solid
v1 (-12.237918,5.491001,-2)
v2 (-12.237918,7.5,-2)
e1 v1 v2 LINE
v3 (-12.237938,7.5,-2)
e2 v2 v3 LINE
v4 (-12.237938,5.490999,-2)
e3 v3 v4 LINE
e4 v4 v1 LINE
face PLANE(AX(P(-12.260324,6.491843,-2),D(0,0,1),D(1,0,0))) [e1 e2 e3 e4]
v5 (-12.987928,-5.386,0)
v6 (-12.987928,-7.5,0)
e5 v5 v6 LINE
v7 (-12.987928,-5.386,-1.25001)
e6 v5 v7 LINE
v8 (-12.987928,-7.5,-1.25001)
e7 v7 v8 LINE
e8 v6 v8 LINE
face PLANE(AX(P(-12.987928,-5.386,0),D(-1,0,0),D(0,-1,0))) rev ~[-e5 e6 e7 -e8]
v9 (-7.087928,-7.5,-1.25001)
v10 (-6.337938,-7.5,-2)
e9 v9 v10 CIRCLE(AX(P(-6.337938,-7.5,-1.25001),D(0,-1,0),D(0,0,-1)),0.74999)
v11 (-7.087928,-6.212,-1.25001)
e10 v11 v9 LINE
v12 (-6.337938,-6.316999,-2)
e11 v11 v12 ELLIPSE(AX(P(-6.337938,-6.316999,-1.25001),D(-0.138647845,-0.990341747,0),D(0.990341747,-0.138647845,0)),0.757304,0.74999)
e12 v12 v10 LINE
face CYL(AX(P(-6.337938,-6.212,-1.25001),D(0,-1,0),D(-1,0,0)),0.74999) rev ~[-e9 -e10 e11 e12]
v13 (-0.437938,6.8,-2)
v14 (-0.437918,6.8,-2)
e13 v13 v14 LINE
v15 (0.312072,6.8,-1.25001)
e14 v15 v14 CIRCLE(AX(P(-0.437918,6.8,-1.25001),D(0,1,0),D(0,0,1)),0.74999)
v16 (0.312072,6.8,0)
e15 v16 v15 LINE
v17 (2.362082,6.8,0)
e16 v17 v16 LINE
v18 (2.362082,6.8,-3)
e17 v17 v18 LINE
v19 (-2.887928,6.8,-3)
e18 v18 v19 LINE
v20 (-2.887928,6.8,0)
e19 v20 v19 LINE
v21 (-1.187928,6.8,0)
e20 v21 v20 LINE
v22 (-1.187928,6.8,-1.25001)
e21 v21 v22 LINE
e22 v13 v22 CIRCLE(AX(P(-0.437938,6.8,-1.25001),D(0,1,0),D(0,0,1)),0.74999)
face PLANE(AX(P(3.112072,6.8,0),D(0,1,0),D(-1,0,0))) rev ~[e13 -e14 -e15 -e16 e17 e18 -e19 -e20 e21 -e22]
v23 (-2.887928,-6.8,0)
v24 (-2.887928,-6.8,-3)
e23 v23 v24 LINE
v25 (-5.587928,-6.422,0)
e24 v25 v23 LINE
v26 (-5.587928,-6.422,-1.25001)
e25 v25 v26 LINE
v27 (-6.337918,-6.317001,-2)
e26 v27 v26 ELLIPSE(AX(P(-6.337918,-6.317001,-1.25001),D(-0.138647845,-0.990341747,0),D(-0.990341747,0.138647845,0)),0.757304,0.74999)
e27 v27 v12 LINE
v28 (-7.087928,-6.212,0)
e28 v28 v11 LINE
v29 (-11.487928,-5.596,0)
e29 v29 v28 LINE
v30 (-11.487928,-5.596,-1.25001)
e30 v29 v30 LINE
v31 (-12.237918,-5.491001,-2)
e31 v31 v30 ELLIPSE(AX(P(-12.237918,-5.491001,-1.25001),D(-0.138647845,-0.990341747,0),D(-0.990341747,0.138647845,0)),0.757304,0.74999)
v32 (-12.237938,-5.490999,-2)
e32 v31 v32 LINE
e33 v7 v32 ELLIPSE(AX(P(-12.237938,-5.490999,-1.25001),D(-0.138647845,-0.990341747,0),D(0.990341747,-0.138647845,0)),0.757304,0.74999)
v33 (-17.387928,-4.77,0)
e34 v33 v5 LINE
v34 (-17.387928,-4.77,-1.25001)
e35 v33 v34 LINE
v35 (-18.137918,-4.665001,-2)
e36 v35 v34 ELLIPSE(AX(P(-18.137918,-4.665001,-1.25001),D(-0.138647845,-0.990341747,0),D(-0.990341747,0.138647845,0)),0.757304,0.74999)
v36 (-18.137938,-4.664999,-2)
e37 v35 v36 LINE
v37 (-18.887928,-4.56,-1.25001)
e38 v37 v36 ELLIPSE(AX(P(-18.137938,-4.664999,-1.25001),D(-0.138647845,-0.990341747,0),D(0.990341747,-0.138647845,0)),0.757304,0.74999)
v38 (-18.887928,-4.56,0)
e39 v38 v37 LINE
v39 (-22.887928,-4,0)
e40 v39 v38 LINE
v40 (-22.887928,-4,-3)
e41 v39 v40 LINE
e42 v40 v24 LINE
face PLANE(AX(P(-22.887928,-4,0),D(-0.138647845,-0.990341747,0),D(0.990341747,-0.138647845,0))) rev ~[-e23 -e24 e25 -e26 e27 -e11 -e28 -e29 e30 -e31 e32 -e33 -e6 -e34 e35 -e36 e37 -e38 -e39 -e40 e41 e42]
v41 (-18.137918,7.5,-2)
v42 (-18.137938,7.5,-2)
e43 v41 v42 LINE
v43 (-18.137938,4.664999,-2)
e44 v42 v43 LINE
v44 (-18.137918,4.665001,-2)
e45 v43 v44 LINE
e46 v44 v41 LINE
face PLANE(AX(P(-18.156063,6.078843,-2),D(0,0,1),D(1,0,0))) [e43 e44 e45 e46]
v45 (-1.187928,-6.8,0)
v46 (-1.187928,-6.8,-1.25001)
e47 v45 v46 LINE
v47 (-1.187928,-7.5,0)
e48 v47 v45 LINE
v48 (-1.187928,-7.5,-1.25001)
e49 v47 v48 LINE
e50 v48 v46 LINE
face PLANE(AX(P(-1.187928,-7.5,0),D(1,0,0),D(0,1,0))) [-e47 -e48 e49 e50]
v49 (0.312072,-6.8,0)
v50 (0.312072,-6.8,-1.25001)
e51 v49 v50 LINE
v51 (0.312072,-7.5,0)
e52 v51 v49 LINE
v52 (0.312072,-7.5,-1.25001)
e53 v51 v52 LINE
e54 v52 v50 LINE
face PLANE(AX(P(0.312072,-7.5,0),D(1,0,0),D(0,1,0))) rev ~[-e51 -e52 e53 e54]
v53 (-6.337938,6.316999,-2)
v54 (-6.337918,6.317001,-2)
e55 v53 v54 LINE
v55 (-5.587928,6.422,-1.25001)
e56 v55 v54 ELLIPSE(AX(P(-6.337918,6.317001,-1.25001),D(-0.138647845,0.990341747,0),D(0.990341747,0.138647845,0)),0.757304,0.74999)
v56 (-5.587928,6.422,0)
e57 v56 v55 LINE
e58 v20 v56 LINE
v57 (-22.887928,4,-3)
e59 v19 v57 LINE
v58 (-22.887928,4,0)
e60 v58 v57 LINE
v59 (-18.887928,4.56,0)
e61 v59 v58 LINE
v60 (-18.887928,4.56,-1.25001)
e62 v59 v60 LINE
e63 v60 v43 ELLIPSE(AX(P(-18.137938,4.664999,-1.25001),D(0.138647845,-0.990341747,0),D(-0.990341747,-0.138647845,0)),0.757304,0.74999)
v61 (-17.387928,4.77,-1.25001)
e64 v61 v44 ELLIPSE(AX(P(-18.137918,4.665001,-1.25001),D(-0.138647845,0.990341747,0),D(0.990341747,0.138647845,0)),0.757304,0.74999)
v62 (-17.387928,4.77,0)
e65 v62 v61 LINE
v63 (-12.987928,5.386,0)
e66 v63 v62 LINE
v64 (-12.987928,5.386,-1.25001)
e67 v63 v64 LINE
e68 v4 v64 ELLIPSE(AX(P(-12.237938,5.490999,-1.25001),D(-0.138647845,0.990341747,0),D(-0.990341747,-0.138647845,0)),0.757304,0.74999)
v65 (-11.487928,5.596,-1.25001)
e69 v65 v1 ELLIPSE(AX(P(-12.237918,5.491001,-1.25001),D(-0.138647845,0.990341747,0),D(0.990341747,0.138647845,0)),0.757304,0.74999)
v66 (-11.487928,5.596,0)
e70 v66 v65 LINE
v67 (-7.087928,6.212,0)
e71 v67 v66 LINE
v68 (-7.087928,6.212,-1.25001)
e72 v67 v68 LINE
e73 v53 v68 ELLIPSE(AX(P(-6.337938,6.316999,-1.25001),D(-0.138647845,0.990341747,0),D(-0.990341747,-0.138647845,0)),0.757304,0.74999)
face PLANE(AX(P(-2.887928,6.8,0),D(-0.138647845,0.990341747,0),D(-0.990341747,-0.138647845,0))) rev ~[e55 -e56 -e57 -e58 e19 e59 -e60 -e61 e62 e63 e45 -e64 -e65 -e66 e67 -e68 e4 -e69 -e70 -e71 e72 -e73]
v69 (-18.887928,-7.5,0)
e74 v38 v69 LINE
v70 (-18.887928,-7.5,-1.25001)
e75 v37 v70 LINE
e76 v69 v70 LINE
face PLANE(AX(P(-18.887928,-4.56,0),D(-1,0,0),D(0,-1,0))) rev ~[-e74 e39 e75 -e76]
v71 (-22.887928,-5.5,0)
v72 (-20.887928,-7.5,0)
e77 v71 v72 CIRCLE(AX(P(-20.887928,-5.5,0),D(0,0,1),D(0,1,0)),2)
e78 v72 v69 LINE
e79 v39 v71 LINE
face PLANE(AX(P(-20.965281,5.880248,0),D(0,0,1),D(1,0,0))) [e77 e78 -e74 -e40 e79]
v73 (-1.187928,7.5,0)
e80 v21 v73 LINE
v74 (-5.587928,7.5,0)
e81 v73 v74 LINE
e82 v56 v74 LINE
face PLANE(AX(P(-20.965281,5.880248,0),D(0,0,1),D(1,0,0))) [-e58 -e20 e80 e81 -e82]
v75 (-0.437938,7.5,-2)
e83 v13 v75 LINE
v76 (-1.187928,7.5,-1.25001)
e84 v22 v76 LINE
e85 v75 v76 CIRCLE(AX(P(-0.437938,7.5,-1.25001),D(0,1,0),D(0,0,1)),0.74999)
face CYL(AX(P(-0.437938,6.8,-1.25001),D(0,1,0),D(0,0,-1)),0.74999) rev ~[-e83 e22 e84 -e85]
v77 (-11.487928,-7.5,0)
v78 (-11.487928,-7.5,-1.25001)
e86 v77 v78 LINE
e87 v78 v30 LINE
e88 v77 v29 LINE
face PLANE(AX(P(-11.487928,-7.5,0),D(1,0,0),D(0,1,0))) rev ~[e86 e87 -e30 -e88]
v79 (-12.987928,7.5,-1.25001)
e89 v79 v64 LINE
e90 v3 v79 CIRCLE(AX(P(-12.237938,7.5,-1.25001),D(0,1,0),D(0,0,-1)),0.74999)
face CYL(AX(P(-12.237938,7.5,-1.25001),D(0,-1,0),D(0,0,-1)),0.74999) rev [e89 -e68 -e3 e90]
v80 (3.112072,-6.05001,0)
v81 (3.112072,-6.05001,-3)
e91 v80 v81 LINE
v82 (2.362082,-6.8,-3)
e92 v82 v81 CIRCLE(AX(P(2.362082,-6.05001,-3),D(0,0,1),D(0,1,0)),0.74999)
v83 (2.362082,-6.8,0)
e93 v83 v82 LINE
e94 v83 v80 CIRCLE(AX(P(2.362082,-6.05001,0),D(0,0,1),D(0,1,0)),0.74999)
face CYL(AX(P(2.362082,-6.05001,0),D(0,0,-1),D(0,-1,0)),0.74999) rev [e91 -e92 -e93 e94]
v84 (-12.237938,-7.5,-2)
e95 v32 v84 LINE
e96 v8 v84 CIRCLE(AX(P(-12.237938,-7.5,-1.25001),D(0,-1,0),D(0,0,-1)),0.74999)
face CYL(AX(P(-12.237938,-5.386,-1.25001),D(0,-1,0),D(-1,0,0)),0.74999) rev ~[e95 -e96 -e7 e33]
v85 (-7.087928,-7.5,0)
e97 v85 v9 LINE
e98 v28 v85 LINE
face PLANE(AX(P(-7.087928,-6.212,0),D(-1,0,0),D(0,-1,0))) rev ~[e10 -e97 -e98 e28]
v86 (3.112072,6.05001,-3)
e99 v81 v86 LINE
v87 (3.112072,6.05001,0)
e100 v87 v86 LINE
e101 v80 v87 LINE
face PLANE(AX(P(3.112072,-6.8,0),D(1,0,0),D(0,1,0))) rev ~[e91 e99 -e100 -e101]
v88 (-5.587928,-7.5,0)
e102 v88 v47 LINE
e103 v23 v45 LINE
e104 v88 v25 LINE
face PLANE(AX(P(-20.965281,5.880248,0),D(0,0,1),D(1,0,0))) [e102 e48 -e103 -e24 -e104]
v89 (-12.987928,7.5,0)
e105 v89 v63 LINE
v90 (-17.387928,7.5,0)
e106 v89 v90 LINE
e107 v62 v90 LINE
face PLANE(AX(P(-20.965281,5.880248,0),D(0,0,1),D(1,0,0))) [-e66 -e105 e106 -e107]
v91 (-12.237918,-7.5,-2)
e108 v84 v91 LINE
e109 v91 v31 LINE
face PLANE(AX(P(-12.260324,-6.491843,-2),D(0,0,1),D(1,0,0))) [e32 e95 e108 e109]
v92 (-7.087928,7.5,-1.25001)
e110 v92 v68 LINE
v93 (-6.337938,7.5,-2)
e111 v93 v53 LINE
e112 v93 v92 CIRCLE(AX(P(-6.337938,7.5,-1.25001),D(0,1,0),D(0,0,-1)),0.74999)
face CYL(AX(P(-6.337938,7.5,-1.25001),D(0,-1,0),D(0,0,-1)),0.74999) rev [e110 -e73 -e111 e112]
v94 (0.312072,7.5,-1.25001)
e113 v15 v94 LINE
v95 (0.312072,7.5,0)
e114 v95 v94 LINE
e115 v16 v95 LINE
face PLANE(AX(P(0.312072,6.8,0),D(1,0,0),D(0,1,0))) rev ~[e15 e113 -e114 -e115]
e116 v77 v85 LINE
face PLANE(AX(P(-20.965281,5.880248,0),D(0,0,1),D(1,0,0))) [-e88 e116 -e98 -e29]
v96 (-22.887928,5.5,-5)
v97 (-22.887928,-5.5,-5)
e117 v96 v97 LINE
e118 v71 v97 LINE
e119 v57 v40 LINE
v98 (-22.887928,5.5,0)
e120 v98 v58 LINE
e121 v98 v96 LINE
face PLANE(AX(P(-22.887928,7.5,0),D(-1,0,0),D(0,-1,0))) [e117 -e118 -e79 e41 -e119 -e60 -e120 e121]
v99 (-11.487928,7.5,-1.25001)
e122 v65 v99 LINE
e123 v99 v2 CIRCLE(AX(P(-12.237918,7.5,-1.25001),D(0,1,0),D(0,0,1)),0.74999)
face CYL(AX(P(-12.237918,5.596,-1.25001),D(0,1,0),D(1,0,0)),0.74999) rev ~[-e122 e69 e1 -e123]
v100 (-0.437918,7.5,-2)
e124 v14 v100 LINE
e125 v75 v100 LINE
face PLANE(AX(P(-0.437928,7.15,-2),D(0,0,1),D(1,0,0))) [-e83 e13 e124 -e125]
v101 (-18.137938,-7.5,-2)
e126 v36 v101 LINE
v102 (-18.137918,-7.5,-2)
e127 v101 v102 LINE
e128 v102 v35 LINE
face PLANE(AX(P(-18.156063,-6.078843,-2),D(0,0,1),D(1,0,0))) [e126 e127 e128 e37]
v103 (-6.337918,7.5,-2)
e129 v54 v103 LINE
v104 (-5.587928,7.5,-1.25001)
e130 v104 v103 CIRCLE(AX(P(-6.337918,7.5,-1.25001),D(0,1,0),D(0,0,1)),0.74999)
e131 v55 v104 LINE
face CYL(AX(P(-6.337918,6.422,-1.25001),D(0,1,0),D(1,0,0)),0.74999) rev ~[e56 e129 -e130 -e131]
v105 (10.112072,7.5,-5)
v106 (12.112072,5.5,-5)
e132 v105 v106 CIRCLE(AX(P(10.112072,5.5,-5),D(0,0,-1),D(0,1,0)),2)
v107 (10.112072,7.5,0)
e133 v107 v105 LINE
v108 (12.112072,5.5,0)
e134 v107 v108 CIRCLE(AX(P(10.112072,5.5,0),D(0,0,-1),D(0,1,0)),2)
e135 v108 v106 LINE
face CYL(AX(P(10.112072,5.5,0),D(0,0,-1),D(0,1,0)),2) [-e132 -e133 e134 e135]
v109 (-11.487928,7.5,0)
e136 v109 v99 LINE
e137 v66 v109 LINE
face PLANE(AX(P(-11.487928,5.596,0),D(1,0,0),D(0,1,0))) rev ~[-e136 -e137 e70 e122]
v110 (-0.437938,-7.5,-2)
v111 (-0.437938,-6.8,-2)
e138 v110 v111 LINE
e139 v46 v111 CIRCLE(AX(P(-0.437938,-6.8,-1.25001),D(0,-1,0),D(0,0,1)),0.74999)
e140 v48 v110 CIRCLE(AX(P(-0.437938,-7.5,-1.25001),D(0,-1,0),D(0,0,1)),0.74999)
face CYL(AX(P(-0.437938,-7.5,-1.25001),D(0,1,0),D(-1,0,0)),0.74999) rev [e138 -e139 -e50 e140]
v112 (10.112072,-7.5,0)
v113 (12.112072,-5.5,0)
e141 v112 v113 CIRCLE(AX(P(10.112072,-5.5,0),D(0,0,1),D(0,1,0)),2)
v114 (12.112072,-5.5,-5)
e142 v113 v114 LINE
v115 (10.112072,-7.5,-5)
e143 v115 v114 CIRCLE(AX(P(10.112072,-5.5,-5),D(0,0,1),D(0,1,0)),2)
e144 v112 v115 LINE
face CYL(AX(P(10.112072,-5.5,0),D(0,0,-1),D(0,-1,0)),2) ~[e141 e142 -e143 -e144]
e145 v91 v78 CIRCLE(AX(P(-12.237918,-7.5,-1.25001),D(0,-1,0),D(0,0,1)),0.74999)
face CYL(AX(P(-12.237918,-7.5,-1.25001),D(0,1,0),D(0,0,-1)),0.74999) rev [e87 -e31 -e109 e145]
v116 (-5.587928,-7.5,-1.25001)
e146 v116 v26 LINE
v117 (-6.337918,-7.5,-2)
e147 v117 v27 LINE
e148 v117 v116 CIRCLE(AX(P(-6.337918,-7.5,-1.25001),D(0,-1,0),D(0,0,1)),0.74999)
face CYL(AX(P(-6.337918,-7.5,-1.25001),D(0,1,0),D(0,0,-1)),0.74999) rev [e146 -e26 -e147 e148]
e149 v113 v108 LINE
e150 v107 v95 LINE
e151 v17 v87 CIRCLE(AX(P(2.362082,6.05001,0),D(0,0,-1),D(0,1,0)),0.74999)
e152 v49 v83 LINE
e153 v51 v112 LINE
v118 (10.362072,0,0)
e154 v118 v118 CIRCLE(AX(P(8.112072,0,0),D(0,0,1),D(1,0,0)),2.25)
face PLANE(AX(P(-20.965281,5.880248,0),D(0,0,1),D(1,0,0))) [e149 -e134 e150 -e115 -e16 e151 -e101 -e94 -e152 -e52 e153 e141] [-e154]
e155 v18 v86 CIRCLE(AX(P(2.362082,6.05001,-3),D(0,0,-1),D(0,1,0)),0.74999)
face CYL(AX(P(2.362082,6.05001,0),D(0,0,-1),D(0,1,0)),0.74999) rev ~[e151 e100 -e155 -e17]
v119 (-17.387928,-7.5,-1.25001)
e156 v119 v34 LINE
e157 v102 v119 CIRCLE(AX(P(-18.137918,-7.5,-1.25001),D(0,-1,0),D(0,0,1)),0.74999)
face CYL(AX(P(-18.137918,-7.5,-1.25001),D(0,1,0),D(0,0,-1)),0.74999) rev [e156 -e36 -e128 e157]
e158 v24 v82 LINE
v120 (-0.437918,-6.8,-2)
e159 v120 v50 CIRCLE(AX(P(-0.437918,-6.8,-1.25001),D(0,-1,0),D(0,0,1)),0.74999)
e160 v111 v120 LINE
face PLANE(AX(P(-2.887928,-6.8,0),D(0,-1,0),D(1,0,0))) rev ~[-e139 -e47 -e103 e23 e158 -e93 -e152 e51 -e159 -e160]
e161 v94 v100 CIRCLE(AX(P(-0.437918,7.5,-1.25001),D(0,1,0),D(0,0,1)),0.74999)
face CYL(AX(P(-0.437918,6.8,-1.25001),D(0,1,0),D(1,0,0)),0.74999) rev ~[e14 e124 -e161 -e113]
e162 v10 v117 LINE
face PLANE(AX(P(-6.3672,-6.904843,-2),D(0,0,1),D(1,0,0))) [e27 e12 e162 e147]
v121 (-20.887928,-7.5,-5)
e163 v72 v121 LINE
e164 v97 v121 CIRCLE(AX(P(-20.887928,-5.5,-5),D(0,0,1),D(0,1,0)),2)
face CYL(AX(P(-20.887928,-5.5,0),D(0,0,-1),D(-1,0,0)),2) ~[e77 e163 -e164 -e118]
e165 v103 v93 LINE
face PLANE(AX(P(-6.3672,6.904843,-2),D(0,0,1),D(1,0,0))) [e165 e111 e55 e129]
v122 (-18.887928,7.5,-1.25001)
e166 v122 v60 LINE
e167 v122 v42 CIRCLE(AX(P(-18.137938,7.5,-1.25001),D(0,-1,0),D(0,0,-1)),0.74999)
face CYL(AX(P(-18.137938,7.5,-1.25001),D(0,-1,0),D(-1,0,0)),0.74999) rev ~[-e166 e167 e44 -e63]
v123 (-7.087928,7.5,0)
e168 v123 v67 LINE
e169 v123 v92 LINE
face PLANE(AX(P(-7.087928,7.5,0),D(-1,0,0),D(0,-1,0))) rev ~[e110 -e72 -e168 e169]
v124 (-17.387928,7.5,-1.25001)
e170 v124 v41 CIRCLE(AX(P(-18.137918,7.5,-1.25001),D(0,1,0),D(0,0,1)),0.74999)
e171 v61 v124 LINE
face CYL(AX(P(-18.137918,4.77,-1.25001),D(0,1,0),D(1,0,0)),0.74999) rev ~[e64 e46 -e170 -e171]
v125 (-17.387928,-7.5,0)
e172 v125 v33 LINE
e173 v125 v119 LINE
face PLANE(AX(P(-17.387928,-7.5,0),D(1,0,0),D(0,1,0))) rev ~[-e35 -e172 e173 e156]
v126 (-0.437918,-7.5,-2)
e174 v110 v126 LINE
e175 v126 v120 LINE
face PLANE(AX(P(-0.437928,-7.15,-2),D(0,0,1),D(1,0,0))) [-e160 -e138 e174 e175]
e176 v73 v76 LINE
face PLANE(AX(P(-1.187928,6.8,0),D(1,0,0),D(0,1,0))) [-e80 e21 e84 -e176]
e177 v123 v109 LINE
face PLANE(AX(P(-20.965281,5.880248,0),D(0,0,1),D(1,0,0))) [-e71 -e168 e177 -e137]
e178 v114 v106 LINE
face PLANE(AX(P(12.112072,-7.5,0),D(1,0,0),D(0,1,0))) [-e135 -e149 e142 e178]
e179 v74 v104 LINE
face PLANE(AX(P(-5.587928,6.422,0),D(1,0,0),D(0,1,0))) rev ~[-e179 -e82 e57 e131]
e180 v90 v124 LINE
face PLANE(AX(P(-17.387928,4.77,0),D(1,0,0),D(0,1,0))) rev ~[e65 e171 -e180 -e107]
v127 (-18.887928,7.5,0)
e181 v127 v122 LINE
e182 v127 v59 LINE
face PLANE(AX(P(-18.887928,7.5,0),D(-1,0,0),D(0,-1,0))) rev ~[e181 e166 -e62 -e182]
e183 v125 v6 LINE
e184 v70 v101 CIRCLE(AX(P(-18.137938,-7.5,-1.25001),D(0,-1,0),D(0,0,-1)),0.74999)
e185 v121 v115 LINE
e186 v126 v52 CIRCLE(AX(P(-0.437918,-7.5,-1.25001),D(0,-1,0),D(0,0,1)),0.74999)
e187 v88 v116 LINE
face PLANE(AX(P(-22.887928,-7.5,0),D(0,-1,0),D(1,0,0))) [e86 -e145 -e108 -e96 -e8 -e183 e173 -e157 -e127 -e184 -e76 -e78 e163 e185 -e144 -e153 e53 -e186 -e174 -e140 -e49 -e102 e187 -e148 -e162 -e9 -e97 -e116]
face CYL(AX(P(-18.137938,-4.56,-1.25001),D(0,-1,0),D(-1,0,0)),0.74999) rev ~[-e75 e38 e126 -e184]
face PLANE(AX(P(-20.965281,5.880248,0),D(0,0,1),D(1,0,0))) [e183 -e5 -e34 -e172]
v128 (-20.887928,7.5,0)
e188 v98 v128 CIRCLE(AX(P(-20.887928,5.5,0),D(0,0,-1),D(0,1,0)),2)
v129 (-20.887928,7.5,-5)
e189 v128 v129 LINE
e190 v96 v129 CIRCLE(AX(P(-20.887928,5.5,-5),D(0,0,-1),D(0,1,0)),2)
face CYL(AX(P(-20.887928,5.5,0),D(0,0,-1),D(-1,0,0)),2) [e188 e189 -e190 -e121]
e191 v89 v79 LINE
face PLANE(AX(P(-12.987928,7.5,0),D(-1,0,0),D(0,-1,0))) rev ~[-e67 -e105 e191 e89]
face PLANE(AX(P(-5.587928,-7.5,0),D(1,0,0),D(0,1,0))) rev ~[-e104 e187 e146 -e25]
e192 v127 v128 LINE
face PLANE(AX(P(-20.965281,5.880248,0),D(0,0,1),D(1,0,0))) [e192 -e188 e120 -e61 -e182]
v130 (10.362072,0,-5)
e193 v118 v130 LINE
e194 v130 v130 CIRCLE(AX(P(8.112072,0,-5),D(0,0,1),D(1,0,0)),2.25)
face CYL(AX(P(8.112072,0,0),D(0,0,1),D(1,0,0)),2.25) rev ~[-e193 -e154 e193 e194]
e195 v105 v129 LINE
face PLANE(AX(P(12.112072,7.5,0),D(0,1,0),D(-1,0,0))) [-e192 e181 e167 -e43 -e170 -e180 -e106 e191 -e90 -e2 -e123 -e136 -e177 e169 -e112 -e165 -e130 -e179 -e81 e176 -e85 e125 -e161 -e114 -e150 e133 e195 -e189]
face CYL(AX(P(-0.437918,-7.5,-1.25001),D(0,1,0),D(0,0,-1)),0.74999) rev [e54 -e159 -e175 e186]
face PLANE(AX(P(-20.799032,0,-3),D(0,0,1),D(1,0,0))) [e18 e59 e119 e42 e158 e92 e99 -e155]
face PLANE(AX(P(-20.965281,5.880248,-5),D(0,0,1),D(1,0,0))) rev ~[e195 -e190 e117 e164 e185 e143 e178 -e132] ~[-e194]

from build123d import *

# Parameters (mm, degrees)
F0_W     = 1.5
F0_H     = 0.7
F0_R     = 2.25
F0_H_2   = 13.6
F0_W_2   = 2.8
F1_DEPTH = 5
F2_DEPTH = 3
F3_DEPTH = 2
F4_R     = 0.74999
F5_R     = 2


# Not quite as in the source:
# - a fillet or chamfer is up to 0.001 mm smaller than in the source, because OpenCascade refuses the exact size


with BuildPart() as f1:
    # F0 (on Top) → F1 (new body)
    with BuildSketch(Plane.XY):
        Polygon((-18.8879279066, 7.5), (-22.8879279066, 7.5), (-22.8879279066, 4), (-18.8879279066, 4.56), align=None)
        Polygon((-17.3879279066, 7.5), (-18.8879279066, 7.5), (-18.8879279066, 4.56), (-17.3879279066, 4.77), align=None)
        Polygon((-18.8879279066, 4.56), (-22.8879279066, 4), (-22.8879279066, -4), (-18.8879279066, -4.56), align=None)
        Polygon((-12.9879279066, 7.5), (-17.3879279066, 7.5), (-17.3879279066, 4.77), (-12.9879279066, 5.386), align=None)
        Polygon((-18.8879279066, -4.56), (-22.8879279066, -4), (-22.8879279066, -7.5), (-18.8879279066, -7.5), align=None)
        Polygon((-11.4879279066, 7.5), (-12.9879279066, 7.5), (-12.9879279066, 5.386), (-11.4879279066, 5.596), align=None)
        Polygon((-17.3879279066, -4.77), (-18.8879279066, -4.56), (-18.8879279066, -7.5), (-17.3879279066, -7.5), align=None)
        Polygon((-7.0879279066, 7.5), (-11.4879279066, 7.5), (-11.4879279066, 5.596), (-7.0879279066, 6.212), align=None)
        Polygon((-12.9879279066, -5.386), (-17.3879279066, -4.77), (-17.3879279066, -7.5), (-12.9879279066, -7.5), align=None)
        Polygon((-5.5879279066, 7.5), (-7.0879279066, 7.5), (-7.0879279066, 6.212), (-5.5879279066, 6.422), align=None)
        Polygon((-11.4879279066, -5.596), (-12.9879279066, -5.386), (-12.9879279066, -7.5), (-11.4879279066, -7.5), align=None)
        Polygon((-1.1879279066, 7.5), (-5.5879279066, 7.5), (-5.5879279066, 6.422), (-2.8879279066, 6.8), (-1.1879279066, 6.8), align=None)
        Polygon((-7.0879279066, -6.212), (-11.4879279066, -5.596), (-11.4879279066, -7.5), (-7.0879279066, -7.5), align=None)
        with Locations((-0.4379279066, 7.15)):
            Rectangle(F0_W, F0_H)
        Polygon((-5.5879279066, -6.422), (-7.0879279066, -6.212), (-7.0879279066, -7.5), (-5.5879279066, -7.5), align=None)
        Polygon((12.1120720934, 7.5), (0.3120720934, 7.5), (0.3120720934, 6.8), (3.1120720934, 6.8), (3.1120720934, -6.8), (0.3120720934, -6.8), (0.3120720934, -7.5), (12.1120720934, -7.5), align=None)
        with Locations((8.1120720934, 0)):
            Circle(F0_R, mode=Mode.SUBTRACT)
        Polygon((-2.8879279066, -6.8), (-5.5879279066, -6.422), (-5.5879279066, -7.5), (-1.1879279066, -7.5), (-1.1879279066, -6.8), align=None)
        with Locations((-0.4379279066, -7.15)):
            Rectangle(F0_W, F0_H)
        with Locations((-0.4379279066, 0)):
            Rectangle(F0_W, F0_H_2)
        Polygon((-5.5879279066, 6.422), (-7.0879279066, 6.212), (-7.0879279066, -6.212), (-5.5879279066, -6.422), align=None)
        Polygon((-17.3879279066, 4.77), (-18.8879279066, 4.56), (-18.8879279066, -4.56), (-17.3879279066, -4.77), align=None)
        Polygon((-12.9879279066, 5.386), (-17.3879279066, 4.77), (-17.3879279066, -4.77), (-12.9879279066, -5.386), align=None)
        Polygon((-7.0879279066, 6.212), (-11.4879279066, 5.596), (-11.4879279066, -5.596), (-7.0879279066, -6.212), align=None)
        Polygon((-11.4879279066, 5.596), (-12.9879279066, 5.386), (-12.9879279066, -5.386), (-11.4879279066, -5.596), align=None)
        Polygon((-2.8879279066, 6.8), (-5.5879279066, 6.422), (-5.5879279066, -6.422), (-2.8879279066, -6.8), (-1.1879279066, -6.8), (-1.1879279066, 6.8), align=None)
        with Locations((1.7120720934, 0)):
            Rectangle(F0_W_2, F0_H_2)
    extrude(amount=-F1_DEPTH)

    # F0 (on Top) → F2 (cut)
    with BuildSketch(Plane.XY):
        Polygon((-18.8879279066, 4.56), (-22.8879279066, 4), (-22.8879279066, -4), (-18.8879279066, -4.56), align=None)
        Polygon((-17.3879279066, 4.77), (-18.8879279066, 4.56), (-18.8879279066, -4.56), (-17.3879279066, -4.77), align=None)
        Polygon((-12.9879279066, 5.386), (-17.3879279066, 4.77), (-17.3879279066, -4.77), (-12.9879279066, -5.386), align=None)
        Polygon((-11.4879279066, 5.596), (-12.9879279066, 5.386), (-12.9879279066, -5.386), (-11.4879279066, -5.596), align=None)
        Polygon((-7.0879279066, 6.212), (-11.4879279066, 5.596), (-11.4879279066, -5.596), (-7.0879279066, -6.212), align=None)
        Polygon((-5.5879279066, 6.422), (-7.0879279066, 6.212), (-7.0879279066, -6.212), (-5.5879279066, -6.422), align=None)
        Polygon((-2.8879279066, 6.8), (-5.5879279066, 6.422), (-5.5879279066, -6.422), (-2.8879279066, -6.8), (-1.1879279066, -6.8), (-1.1879279066, 6.8), align=None)
        with Locations((-0.4379279066, 0)):
            Rectangle(F0_W, F0_H_2)
        with Locations((1.7120720934, 0)):
            Rectangle(F0_W_2, F0_H_2)
    extrude(amount=-F2_DEPTH, mode=Mode.SUBTRACT)

    # F0 (on Top) → F3 (cut)
    with BuildSketch(Plane.XY):
        Polygon((-17.3879279066, 7.5), (-18.8879279066, 7.5), (-18.8879279066, 4.56), (-17.3879279066, 4.77), align=None)
        Polygon((-11.4879279066, 7.5), (-12.9879279066, 7.5), (-12.9879279066, 5.386), (-11.4879279066, 5.596), align=None)
        Polygon((-5.5879279066, 7.5), (-7.0879279066, 7.5), (-7.0879279066, 6.212), (-5.5879279066, 6.422), align=None)
        with Locations((-0.4379279066, -7.15)):
            Rectangle(F0_W, F0_H)
        Polygon((-17.3879279066, -4.77), (-18.8879279066, -4.56), (-18.8879279066, -7.5), (-17.3879279066, -7.5), align=None)
        Polygon((-11.4879279066, -5.596), (-12.9879279066, -5.386), (-12.9879279066, -7.5), (-11.4879279066, -7.5), align=None)
        Polygon((-5.5879279066, -6.422), (-7.0879279066, -6.212), (-7.0879279066, -7.5), (-5.5879279066, -7.5), align=None)
        with Locations((-0.4379279066, 7.15)):
            Rectangle(F0_W, F0_H)
    extrude(amount=-F3_DEPTH, mode=Mode.SUBTRACT)

    # F4 (radius 0.75 in the source; OpenCascade refuses exactly that, so slightly less here)
    f4_edges = [f1.edges().sort_by_distance(p)[0] for p in [
        (-17.387928, -6.135, -2),
        (-11.487928, -6.548, -2),
        (-5.587928, -6.961, -2),
        (0.312072, -7.15, -2),
        (-18.887928, -6.03, -2),
        (-12.987928, -6.443, -2),
        (-7.087928, -6.856, -2),
        (-1.187928, -7.15, -2),
        (-18.887928, 6.03, -2),
        (-12.987928, 6.443, -2),
        (-7.087928, 6.856, -2),
        (-1.187928, 7.15, -2),
        (-17.387928, 6.135, -2),
        (-11.487928, 6.548, -2),
        (-5.587928, 6.961, -2),
        (0.312072, 7.15, -2),
        (3.112072, 6.8, -1.5),
        (3.112072, -6.8, -1.5),
    ]]
    fillet(f4_edges, radius=F4_R)

    # F5
    f5_edges = [f1.edges().sort_by_distance(p)[0] for p in [
        (-22.887928, -7.5, -2.5),
        (-22.887928, 7.5, -2.5),
        (12.112072, -7.5, -2.5),
        (12.112072, 7.5, -2.5),
    ]]
    fillet(f5_edges, radius=F5_R)


solid = f1.part
